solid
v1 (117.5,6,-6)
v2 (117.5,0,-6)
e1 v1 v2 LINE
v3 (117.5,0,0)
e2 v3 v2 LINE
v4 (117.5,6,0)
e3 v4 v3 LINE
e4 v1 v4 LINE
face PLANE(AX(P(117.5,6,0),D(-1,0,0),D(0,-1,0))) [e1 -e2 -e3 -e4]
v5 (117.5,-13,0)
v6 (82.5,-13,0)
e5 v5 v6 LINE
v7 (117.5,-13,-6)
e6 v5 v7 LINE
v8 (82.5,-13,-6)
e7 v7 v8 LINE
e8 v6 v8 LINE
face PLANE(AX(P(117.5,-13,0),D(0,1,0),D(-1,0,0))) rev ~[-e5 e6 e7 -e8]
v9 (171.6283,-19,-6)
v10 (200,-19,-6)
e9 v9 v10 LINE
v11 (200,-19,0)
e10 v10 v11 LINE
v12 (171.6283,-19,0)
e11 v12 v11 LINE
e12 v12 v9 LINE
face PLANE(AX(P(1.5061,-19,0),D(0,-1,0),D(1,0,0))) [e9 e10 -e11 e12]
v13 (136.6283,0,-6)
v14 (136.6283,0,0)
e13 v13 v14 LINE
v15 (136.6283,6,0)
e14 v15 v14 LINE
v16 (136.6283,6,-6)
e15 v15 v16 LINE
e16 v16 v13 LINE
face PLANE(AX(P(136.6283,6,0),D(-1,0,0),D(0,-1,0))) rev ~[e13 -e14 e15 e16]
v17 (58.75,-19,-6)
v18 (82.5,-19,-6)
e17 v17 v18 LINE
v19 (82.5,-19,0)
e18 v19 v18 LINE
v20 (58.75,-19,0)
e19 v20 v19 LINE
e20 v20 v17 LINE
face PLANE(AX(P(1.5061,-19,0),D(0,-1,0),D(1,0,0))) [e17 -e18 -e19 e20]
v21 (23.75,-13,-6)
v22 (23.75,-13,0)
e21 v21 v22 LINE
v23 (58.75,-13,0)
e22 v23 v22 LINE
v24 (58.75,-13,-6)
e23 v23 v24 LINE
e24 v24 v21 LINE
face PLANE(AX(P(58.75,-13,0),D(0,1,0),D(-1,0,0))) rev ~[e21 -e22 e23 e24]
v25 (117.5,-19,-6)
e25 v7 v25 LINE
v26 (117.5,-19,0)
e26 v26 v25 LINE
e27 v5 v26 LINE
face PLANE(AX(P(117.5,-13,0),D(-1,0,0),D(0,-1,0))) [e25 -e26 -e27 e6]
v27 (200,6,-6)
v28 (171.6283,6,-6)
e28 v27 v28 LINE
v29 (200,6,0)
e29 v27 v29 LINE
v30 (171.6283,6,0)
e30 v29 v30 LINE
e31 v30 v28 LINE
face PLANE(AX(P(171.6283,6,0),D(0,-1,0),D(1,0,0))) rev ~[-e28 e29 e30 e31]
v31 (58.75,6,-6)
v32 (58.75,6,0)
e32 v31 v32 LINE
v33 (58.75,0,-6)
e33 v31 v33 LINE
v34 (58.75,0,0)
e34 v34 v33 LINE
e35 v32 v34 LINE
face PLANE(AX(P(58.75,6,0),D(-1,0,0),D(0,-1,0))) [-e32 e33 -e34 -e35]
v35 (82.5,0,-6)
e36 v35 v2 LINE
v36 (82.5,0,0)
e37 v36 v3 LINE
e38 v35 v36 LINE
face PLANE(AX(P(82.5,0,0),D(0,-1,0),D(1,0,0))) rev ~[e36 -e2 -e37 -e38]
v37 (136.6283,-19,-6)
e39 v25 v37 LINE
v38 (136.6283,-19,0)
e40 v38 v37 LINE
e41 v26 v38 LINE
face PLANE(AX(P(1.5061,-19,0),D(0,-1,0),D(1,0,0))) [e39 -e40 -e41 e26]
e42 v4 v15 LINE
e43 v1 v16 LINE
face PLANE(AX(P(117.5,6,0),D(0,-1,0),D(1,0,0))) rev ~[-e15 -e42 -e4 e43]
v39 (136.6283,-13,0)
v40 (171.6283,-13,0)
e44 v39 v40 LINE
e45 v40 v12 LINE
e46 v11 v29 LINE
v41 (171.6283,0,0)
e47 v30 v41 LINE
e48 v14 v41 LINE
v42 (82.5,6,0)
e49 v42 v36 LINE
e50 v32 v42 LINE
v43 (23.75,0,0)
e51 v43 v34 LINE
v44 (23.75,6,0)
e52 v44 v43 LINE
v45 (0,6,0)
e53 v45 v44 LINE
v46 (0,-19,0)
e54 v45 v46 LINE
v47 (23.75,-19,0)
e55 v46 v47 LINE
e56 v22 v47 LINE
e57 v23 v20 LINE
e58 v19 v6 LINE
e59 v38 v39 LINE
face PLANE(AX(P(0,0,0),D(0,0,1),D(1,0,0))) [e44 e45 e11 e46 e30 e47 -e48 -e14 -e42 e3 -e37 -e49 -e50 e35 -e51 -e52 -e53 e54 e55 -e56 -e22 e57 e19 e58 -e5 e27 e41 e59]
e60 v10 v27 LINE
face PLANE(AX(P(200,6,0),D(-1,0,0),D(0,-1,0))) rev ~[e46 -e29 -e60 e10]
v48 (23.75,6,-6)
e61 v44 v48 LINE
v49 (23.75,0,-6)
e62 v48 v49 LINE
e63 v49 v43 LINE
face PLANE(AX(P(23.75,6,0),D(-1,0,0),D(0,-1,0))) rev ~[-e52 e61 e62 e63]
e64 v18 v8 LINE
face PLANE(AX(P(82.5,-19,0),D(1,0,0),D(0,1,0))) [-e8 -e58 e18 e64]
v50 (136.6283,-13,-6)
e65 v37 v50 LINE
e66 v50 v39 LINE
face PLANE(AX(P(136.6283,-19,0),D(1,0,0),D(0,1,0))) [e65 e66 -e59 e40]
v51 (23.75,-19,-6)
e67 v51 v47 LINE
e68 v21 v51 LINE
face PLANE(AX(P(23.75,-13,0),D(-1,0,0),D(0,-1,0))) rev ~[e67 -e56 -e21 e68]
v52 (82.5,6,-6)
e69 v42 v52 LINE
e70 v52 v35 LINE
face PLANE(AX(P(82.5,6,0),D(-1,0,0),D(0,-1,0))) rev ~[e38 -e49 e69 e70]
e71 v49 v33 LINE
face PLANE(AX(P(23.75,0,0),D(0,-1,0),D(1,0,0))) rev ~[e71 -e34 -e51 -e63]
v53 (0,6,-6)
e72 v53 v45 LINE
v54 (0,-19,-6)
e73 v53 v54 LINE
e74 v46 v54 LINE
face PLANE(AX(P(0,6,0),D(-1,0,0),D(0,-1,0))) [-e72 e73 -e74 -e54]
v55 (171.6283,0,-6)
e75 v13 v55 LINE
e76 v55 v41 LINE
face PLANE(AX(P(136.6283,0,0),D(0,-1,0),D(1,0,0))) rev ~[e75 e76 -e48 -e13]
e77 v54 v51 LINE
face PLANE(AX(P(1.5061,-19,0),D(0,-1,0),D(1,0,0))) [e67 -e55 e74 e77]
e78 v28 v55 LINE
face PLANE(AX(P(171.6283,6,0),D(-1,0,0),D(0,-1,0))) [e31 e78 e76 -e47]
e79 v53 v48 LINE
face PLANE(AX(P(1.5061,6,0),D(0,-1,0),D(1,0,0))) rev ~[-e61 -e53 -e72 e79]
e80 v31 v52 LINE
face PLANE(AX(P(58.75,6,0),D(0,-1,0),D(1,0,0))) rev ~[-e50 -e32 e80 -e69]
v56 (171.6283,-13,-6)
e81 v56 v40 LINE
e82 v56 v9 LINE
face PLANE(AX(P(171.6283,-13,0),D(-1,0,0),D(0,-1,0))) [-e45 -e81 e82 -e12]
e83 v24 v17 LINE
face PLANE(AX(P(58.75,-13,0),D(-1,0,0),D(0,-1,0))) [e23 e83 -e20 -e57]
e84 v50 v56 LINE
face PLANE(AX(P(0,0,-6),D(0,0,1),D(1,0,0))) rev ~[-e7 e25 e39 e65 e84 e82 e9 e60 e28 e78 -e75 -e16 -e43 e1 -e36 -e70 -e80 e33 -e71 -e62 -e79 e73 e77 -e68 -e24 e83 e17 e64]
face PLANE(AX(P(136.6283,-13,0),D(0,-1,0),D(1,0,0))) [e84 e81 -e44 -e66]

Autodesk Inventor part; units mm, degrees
ref_plane "YZ Plane" through (0, 0, 0) normal (1, 0, 0) x (0, 1, 0)
ref_plane "XZ Plane" through (0, 0, 0) normal (0, 1, 0) x (-1, 0, 0)
ref_plane "XY Plane" through (0, 0, 0) normal (0, 0, 1) x (1, 0, 0)
sketch "Sketch1" plane through (0, 0, 0) normal (0, 0, 1) x (1, 0, 0)
  line L0 (200, 0) -> (171.6283, 0) construction
  line L1 (200, 6) -> (200, 0)
  line L2 (171.6283, 6) -> (200, 6)
  line L3 (171.6283, 6) -> (171.6283, 0)
  line L4 (136.6283, 6) -> (136.6283, 0)
  line L5 (136.6283, 0) -> (171.6283, 0)
  line L6 (171.6283, 0) -> (171.6283, 6)
  line L7 (136.6283, 6) -> (171.6283, 6)
  line L8 (136.6283, 0) -> (117.5, 0) construction
  line L9 (136.6283, 6) -> (136.6283, 0)
  line L10 (117.5, 6) -> (136.6283, 6)
  line L11 (117.5, 6) -> (117.5, 0)
  line L12 (117.5, 0) -> (117.5, 6)
  line L13 (82.5, 6) -> (117.5, 6)
  line L14 (82.5, 6) -> (82.5, 0)
  line L15 (82.5, 0) -> (117.5, 0)
  line L16 (82.5, 0) -> (58.75, 0) construction
  line L17 (82.5, 6) -> (82.5, 0)
  line L18 (58.75, 6) -> (82.5, 6)
  line L19 (58.75, 6) -> (58.75, 0)
  line L20 (23.75, 6) -> (23.75, 0)
  line L21 (23.75, 0) -> (58.75, 0)
  line L22 (58.75, 0) -> (58.75, 6)
  line L23 (23.75, 6) -> (58.75, 6)
  line L24 (23.75, 0) -> (0, 0) construction
  line L25 (23.75, 6) -> (23.75, 0)
  line L26 (0, 6) -> (23.75, 6)
  line L27 (0, 0) -> (0, 6)
  line L28 (200, 6) -> (1.5061, 6)
  line L29 (1.5061, 6) -> (1.5061, -19)
  line L30 (1.5061, -19) -> (200, -19)
  line L31 (200, -19) -> (200, 6)
extrude "Extrusion1" add sketch "Sketch1" against normal blind 6 contours L1 L31 L30 L29 L26 L20 L21 L19 L18 L14 L15 L11 L10 L4 L5 L3 L2
sketch "Sketch2" plane through (0, 0, 0) normal (0, 0, 1) x (1, 0, 0)
  line L0 (200, 6) -> (171.6283, 6) projected
  line L1 (171.6283, 0) -> (171.6283, 6) projected
  line L2 (136.6283, 0) -> (171.6283, 0) projected
  line L3 (136.6283, 6) -> (136.6283, 0) projected
  line L4 (136.6283, 6) -> (117.5, 6) projected
  line L5 (117.5, 0) -> (82.5, 0) projected
  line L6 (82.5, 6) -> (82.5, 0) projected
  line L7 (82.5, 6) -> (58.75, 6) projected
  line L8 (58.75, 0) -> (58.75, 6) projected
  line L9 (58.75, 0) -> (23.75, 0) projected
  line L10 (23.75, 0) -> (23.75, 6) projected
  line L11 (23.75, 6) -> (1.5061, 6) projected
  line L12 (1.5061, -19) -> (200, -19) construction
  line L13 (200, -19) -> (1.5061, -19) construction
  line L14 (195.1496, -19) -> (195.1496, 6) construction
  line L15 (171.6283, 6) -> (200, 6) construction
  line L16 (195.1496, -6.5) -> (183.8978, -6.5) construction
  line L17 (200, -19) -> (171.6283, -19)
  line L18 (171.6283, -13) -> (171.6283, -19)
  line L19 (136.6283, -13) -> (171.6283, -13)
  line L20 (136.6283, -19) -> (136.6283, -13)
  line L21 (136.6283, -19) -> (117.5, -19)
  line L22 (117.5, -13) -> (82.5, -13)
  line L23 (82.5, -19) -> (82.5, -13)
  line L24 (82.5, -19) -> (58.75, -19)
  line L25 (58.75, -13) -> (58.75, -19)
  line L26 (58.75, -13) -> (23.75, -13)
  line L27 (23.75, -13) -> (23.75, -19)
  line L28 (23.75, -19) -> (1.5061, -19)
  line L29 (195.1496, 6) -> (195.1496, -19) construction
  line L30 (171.6283, -19) -> (200, -19) construction
  line L31 (117.5, -13) -> (117.5, -19)
  line L32 (82.5, -19) -> (117.5, -19)
  line L33 (23.75, -19) -> (58.75, -19)
  line L34 (171.6283, -19) -> (136.6283, -19)
  point P0 (0, 0)
  point P1 (0, -13)
extrude "Extrusion2" cut sketch "Sketch2" against normal through all
move faces "Move1" translate (-1.5061, 0, 0) faces at (1.5061, -2.3333, -2)
properties part number "top"
